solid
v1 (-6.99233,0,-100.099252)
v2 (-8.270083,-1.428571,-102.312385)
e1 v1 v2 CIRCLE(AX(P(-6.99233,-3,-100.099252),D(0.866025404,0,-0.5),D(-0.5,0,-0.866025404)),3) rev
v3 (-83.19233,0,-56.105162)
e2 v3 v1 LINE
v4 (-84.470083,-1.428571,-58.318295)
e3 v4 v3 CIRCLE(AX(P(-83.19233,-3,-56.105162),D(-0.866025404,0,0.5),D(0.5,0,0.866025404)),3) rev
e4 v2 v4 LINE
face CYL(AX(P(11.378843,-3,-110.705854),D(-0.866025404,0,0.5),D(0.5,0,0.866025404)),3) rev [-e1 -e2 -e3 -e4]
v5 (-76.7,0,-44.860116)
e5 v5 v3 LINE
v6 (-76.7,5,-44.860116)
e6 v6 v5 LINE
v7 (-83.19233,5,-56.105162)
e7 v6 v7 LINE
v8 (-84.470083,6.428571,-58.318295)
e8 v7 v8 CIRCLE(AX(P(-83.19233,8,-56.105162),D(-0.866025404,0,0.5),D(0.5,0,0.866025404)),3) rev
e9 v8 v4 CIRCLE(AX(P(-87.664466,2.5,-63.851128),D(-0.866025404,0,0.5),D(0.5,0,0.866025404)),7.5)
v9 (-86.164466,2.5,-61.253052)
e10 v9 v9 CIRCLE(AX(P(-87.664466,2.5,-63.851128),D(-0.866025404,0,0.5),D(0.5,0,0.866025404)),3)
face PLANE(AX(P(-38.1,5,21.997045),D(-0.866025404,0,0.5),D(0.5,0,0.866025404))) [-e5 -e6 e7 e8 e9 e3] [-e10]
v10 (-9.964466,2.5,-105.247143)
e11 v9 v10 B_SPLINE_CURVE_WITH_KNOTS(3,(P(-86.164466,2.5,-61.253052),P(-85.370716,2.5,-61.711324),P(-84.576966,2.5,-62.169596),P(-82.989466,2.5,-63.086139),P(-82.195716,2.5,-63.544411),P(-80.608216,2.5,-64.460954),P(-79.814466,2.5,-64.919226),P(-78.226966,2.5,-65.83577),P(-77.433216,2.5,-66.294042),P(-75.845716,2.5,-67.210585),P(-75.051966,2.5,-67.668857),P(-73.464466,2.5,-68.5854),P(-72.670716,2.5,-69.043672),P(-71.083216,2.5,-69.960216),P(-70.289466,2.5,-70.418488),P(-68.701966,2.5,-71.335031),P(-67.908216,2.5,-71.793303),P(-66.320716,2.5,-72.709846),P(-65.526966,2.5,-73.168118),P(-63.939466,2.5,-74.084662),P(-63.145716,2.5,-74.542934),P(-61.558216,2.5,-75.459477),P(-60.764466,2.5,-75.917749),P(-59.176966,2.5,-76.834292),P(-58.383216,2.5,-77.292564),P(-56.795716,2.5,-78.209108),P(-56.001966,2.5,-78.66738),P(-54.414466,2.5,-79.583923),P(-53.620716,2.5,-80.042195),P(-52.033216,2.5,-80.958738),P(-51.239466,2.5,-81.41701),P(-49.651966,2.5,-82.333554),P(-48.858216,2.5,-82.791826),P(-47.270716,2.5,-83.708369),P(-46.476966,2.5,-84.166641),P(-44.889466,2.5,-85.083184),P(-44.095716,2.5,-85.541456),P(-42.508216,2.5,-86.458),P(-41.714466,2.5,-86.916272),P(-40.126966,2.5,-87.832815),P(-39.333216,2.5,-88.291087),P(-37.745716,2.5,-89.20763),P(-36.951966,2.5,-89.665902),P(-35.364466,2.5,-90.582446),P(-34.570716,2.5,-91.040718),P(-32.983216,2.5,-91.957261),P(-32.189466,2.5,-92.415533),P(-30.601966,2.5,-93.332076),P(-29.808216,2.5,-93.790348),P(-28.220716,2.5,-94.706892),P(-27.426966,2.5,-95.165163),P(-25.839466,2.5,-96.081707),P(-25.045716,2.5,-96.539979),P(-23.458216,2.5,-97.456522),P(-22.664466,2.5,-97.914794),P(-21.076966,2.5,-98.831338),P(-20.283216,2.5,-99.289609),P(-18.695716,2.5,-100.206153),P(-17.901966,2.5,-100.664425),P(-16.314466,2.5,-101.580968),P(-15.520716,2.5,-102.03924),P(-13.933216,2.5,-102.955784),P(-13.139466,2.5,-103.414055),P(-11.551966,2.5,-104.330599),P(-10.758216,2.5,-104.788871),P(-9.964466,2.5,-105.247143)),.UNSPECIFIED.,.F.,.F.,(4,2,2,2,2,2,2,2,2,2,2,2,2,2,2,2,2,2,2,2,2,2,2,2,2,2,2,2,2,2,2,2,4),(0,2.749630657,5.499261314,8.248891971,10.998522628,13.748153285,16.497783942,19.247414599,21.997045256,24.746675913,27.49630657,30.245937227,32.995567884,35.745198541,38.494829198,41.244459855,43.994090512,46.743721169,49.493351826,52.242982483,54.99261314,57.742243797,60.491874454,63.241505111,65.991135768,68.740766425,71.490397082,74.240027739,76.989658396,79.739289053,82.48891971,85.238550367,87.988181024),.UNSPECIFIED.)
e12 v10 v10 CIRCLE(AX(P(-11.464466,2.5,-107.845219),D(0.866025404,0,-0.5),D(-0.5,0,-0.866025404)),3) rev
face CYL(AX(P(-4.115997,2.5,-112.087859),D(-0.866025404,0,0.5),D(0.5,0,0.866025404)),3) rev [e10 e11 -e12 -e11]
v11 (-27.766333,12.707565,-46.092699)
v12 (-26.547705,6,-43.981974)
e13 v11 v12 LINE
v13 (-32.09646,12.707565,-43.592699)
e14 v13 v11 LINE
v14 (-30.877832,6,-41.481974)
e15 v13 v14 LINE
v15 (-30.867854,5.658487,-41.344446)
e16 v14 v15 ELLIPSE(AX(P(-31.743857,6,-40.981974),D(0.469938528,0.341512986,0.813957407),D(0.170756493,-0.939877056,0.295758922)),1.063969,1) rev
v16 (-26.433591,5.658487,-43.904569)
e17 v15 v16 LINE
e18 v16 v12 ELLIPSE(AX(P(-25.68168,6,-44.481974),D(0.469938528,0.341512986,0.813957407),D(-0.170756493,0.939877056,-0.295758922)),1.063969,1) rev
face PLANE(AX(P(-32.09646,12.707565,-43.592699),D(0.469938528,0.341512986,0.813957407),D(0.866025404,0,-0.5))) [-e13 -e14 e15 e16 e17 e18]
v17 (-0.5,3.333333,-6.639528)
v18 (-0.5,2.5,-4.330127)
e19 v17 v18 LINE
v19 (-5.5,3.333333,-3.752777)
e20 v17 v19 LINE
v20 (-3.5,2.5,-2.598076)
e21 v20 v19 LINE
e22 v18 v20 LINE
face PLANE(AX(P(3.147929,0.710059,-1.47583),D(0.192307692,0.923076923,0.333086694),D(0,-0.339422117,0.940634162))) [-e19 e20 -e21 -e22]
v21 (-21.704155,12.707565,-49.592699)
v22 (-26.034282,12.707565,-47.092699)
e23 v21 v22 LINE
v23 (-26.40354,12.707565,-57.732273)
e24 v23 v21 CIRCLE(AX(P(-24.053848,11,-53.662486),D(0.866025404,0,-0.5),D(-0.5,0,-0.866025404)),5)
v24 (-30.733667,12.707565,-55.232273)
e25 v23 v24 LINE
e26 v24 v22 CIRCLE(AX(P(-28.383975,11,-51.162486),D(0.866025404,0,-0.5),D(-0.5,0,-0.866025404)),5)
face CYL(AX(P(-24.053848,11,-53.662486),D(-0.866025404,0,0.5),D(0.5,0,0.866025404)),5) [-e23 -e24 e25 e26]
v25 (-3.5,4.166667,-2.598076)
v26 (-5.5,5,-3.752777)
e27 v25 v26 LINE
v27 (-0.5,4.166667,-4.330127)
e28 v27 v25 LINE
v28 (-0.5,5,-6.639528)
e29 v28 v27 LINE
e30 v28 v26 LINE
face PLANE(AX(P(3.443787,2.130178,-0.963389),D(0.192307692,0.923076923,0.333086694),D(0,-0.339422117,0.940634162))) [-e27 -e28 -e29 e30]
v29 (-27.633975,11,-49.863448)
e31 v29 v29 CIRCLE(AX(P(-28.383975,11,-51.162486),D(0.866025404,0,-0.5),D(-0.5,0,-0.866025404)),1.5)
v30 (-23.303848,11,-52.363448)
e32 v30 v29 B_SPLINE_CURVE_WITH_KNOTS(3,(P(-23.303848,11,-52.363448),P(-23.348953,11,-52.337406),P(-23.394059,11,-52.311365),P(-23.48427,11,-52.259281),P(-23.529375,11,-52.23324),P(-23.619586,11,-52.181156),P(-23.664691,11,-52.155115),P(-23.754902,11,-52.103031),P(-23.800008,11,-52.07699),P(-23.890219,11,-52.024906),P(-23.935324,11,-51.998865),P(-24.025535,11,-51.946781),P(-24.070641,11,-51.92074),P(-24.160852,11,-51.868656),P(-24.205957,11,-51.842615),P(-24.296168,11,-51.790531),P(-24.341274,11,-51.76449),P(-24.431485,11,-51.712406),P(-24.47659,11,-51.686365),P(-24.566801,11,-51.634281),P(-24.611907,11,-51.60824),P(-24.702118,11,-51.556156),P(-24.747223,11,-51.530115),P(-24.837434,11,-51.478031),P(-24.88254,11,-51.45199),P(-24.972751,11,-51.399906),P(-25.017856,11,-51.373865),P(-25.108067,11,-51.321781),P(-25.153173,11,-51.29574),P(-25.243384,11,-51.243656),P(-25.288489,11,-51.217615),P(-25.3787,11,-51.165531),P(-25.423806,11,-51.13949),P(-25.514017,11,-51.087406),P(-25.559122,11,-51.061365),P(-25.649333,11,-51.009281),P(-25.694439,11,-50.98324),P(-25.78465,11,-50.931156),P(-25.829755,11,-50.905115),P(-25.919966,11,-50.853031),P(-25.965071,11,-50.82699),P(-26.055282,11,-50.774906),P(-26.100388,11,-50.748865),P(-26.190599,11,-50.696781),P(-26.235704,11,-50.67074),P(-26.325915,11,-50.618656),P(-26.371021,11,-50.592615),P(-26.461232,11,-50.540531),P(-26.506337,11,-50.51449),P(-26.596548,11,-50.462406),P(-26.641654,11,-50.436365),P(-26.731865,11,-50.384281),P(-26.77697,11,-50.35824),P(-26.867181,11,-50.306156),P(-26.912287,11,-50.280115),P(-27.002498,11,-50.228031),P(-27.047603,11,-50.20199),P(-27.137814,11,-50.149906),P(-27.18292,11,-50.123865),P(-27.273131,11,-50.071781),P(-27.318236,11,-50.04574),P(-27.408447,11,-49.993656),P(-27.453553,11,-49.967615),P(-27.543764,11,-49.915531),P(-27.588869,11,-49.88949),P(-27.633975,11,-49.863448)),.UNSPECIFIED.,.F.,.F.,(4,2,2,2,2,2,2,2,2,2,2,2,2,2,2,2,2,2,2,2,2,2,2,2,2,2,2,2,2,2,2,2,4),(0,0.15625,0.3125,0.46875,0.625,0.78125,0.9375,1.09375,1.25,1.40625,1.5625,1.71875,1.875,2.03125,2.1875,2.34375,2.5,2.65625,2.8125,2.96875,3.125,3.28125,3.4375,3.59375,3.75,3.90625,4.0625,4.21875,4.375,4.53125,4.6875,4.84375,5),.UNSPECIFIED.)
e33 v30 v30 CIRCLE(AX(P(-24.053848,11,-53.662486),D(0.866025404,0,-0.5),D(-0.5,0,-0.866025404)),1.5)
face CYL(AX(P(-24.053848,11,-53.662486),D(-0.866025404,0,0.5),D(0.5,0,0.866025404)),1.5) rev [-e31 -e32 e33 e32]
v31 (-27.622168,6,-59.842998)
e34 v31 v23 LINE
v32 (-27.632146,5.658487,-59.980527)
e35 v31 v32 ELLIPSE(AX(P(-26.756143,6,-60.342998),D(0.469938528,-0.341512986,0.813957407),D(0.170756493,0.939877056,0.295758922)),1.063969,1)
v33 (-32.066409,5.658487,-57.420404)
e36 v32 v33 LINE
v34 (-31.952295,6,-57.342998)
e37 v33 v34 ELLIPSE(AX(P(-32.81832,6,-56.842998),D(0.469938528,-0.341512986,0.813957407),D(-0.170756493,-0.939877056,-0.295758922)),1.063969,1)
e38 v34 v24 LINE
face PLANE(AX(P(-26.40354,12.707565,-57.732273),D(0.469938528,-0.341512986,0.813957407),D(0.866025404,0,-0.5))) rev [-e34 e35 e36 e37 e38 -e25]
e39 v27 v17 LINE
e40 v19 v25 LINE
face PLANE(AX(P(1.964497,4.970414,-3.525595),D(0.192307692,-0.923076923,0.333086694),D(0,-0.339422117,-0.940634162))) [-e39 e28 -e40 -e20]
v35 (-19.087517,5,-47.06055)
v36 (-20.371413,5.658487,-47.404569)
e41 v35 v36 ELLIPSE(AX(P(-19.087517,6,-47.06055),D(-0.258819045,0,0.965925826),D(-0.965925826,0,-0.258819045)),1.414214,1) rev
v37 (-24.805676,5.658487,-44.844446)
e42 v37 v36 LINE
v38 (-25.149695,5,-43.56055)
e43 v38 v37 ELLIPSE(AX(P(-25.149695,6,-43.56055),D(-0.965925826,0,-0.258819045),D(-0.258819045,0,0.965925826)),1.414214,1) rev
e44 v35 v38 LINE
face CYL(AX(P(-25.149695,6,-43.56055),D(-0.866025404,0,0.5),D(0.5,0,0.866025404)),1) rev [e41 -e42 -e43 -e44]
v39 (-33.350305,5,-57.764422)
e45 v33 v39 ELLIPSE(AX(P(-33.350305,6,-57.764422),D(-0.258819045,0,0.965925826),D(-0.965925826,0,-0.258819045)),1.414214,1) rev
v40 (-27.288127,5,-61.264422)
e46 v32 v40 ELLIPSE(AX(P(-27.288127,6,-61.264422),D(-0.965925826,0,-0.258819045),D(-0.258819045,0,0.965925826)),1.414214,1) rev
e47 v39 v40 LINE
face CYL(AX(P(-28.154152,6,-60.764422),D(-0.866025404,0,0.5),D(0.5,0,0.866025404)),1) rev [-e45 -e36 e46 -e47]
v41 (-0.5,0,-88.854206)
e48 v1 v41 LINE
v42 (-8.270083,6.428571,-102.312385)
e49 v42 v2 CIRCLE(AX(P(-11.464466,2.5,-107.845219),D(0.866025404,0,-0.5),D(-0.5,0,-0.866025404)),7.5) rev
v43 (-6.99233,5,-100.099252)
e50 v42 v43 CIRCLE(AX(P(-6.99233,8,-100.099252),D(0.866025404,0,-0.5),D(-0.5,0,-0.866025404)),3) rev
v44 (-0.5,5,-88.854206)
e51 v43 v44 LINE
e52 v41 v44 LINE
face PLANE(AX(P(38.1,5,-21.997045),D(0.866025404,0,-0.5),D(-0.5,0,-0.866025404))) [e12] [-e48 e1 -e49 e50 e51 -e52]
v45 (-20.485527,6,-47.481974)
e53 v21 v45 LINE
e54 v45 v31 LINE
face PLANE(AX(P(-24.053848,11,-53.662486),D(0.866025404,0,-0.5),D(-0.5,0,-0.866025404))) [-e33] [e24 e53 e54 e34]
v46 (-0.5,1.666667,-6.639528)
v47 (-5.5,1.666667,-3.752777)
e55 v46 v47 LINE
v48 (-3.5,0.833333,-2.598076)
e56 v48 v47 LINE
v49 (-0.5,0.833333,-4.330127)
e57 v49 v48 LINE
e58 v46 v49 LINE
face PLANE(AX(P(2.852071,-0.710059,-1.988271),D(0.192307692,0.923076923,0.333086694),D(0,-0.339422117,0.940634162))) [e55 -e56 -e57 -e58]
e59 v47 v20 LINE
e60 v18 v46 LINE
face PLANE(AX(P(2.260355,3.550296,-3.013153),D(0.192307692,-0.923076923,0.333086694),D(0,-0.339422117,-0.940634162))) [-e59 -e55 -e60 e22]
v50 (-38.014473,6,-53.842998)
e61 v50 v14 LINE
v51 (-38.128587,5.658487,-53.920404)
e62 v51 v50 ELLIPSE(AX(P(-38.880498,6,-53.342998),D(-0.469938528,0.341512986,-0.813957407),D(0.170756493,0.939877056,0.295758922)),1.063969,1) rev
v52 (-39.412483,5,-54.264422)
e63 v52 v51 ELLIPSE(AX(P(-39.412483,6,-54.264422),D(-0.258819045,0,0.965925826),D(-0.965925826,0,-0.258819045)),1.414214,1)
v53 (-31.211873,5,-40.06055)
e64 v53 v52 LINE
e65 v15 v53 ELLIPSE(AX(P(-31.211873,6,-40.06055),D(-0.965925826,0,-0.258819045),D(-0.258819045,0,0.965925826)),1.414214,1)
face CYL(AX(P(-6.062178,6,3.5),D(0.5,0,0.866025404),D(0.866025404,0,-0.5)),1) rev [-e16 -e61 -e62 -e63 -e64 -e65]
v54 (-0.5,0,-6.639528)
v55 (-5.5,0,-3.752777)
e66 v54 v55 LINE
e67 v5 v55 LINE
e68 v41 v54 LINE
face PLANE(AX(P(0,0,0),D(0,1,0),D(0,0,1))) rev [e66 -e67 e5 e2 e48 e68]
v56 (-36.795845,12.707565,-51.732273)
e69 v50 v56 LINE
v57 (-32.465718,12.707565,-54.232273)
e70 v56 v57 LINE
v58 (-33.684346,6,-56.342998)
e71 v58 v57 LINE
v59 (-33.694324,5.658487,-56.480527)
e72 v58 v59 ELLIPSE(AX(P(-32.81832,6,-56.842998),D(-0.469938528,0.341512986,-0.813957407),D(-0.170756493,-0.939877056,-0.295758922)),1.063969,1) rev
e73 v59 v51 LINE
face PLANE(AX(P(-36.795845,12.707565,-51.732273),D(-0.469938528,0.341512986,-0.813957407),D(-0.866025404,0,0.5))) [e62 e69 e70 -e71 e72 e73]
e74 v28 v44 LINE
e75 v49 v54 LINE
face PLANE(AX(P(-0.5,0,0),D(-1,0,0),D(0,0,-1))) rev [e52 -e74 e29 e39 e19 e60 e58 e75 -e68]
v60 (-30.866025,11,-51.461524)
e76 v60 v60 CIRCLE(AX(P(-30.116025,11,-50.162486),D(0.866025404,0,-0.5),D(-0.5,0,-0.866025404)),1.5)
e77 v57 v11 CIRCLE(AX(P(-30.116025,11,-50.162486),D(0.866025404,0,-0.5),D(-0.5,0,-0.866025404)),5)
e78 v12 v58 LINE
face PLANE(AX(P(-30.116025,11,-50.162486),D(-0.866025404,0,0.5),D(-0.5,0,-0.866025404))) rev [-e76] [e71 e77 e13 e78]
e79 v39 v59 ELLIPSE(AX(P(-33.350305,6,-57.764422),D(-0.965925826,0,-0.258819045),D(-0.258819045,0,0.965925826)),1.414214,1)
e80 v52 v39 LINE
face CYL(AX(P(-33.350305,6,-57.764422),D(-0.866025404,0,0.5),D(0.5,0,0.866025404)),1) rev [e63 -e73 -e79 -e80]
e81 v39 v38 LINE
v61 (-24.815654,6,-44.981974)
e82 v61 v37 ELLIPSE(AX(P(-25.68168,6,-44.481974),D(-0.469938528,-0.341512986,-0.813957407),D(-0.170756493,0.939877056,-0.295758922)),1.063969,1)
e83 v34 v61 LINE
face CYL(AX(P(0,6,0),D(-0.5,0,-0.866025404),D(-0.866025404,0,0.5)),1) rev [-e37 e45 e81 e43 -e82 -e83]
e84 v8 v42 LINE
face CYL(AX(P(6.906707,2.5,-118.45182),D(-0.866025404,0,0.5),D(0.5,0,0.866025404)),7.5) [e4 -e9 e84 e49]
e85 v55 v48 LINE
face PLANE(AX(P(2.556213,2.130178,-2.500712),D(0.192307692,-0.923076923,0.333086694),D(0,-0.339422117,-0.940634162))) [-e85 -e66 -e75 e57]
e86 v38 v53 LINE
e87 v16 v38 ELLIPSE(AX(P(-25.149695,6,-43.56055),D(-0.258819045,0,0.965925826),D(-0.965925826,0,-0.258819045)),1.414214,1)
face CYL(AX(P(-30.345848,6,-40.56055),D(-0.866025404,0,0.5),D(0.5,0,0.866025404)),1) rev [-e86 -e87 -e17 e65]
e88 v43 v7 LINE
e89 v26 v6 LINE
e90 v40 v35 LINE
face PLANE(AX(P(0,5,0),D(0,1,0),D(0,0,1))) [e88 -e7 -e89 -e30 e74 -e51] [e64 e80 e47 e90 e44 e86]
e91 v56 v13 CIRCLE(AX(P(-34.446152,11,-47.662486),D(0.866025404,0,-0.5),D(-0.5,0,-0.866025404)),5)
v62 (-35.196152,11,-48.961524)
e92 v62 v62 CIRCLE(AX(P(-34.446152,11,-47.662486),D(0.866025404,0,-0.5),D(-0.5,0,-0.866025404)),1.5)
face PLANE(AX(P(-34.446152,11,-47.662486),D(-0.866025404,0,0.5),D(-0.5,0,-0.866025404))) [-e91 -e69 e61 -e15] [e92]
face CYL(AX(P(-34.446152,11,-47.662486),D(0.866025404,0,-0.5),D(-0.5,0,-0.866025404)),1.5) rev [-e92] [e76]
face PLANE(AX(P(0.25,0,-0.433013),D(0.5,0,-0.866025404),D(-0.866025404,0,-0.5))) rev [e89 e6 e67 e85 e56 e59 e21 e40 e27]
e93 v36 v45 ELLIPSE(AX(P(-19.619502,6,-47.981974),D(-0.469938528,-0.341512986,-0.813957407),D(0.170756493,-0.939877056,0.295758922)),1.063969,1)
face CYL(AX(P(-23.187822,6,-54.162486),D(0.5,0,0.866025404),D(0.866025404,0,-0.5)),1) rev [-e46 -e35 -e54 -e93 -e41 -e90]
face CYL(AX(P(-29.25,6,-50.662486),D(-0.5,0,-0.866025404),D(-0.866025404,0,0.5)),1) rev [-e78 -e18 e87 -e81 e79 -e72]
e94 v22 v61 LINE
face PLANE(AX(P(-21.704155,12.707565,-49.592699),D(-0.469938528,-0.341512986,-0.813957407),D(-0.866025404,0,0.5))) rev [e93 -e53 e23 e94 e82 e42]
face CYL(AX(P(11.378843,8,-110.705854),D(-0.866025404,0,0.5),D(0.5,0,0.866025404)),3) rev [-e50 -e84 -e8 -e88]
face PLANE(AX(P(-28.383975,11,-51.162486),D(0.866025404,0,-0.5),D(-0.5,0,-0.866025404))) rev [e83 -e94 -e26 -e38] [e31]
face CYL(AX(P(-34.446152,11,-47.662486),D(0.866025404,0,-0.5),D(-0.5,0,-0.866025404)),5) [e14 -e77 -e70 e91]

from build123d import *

# Parameters (mm, degrees)
BOSS_EXTRUDE1_DEPTH = 5
SKETCH2_R           = 7.5
BOSS_EXTRUDE2_DEPTH = 87.988181024
SKETCH3_R           = 3
CUT_EXTRUDE1_DEPTH  = 87.988181024
CUT_EXTRUDE2_DEPTH  = 5
BOSS_EXTRUDE3_DEPTH = 6.928203
CUT_EXTRUDE3_START  = -0.5
SKETCH10_W          = 96.059977794
SKETCH10_H          = 5
CUT_EXTRUDE3_DEPTH  = 10.5
BOSS_EXTRUDE4_START = 1
SKETCH11_R          = 1.5
BOSS_EXTRUDE4_DEPTH = 5
FILLET1_R           = 1
FILLET2_R           = 3


with BuildPart() as part:
    # Sketch1 → Boss-Extrude1 (new body)
    with BuildSketch(Plane(origin=(0, 0, 0), x_dir=(1, 0, 0), z_dir=(0, 1, 0))):
        Polygon((0, 87.988181024), (0, 0), (-76.2, 43.994090512), (-91.2, 69.974852626), (-15, 113.968943138), align=None)
    extrude(amount=BOSS_EXTRUDE1_DEPTH)

    # Sketch2 → Boss-Extrude2 (add)
    with BuildSketch(Plane(origin=(-38.1, 0, 21.997045256), x_dir=(0.49999999999999967, 0, 0.8660254037844388), z_dir=(-0.8660254037844388, 0, 0.49999999999999967))):
        with Locations((-99.128932188, 2.5)):
            Circle(SKETCH2_R)
    extrude(amount=-BOSS_EXTRUDE2_DEPTH)

    # Sketch3 → Cut-Extrude1 (cut)
    with BuildSketch(Plane(origin=(-38.1, 0, 21.997045256), x_dir=(0.49999999999999967, 0, 0.8660254037844388), z_dir=(-0.8660254037844388, 0, 0.49999999999999967))):
        with Locations((-99.128932188, 2.5)):
            Circle(SKETCH3_R)
    extrude(amount=-CUT_EXTRUDE1_DEPTH, mode=Mode.SUBTRACT)

    # Sketch5 → Cut-Extrude2 (cut)
    with BuildSketch(Plane(origin=(0, 5, 0), x_dir=(1, 0, 0), z_dir=(0, 1, 0))):
        Polygon((-6, 3.464101615), (0, 6.92820323), (0, 0), align=None)
    extrude(amount=-CUT_EXTRUDE2_DEPTH, mode=Mode.SUBTRACT)

    # Sketch7 → Boss-Extrude3 (add)
    with BuildSketch(Plane(origin=(-3, 0, 1.732050808), x_dir=(0, 1, 0), z_dir=(0.8660254037844383, 0, -0.5000000000000006))):
        Polygon((0.833333333, -4), (0, -6), (1.666666667, -6), align=None)
        Polygon((2.5, -4), (1.666666667, -6), (3.333333333, -6), align=None)
        Polygon((4.166666667, -4), (3.333333333, -6), (5, -6), align=None)
    extrude(amount=BOSS_EXTRUDE3_DEPTH)

    # Sketch10 → Cut-Extrude3 (cut)
    with BuildSketch(Plane(origin=(0, 0, 0), x_dir=(0.8660254037844386, 0, 0.5000000000000001), z_dir=(-0.5000000000000001, 0, 0.8660254037844386)).offset(CUT_EXTRUDE3_START)):
        with Locations((-44.958192127, 2.5)):
            Rectangle(SKETCH10_W, SKETCH10_H)
    cut_extrude3 = extrude(amount=CUT_EXTRUDE3_DEPTH, mode=Mode.SUBTRACT)

    # Mirror1: Cut-Extrude3 across plane
    add(cut_extrude3.mirror(Plane(origin=(0, 0, 0), x_dir=(0.4999999999999997, 0, 0.8660254037844387), z_dir=(0.8660254037844387, 0, -0.49999999999999983))), mode=Mode.SUBTRACT)

    # Sketch11 → Boss-Extrude4 (add)
    with BuildSketch(Plane(origin=(0, 0, 0), x_dir=(-0.49999999999999983, 0, -0.8660254037844387), z_dir=(0.8660254037844387, 0, -0.49999999999999983)).offset(BOSS_EXTRUDE4_START)):
        with BuildLine():
            Line((53.800614721, 12.707564932), (51, 5))
            Line((51, 5), (66, 5))
            Line((66, 5), (63.199385279, 12.707564932))
            ThreePointArc((63.199385279, 12.707564932), (58.5, 16), (53.800614721, 12.707564932))
        make_face()
        with Locations(Location((58.5, 11, 0), (0, 0, 180))):
            Circle(SKETCH11_R, mode=Mode.SUBTRACT)
    boss_extrude4 = extrude(amount=BOSS_EXTRUDE4_DEPTH)

    # Mirror2: Boss-Extrude4 across plane
    add(boss_extrude4.mirror(Plane(origin=(0, 0, 0), x_dir=(0.4999999999999997, 0, 0.8660254037844387), z_dir=(0.8660254037844387, 0, -0.49999999999999983))))

    # Fillet1
    fillet1_edges = [part.edges().sort_by_distance(p)[0] for p in [
        (-24.053847577, 5, -53.662486121),
        (-28.383974596, 5, -51.162486121),
        (-22.468911087, 5, -45.917295593),
        (-29.968911087, 5, -58.90767665),
        (-34.446152423, 5, -47.662486121),
        (-36.031088913, 5, -55.40767665),
        (-28.531088913, 5, -42.417295593),
        (-30.116025404, 5, -50.162486121),
    ]]
    fillet(fillet1_edges, radius=FILLET1_R - 0.0001)  # a hair under: the kernel refuses the full size

    # Fillet2
    fillet2_edges = [part.edges().sort_by_distance(p)[0] for p in [
        (-46.028932188, 0, -79.724449168),
        (-46.028932188, 5, -79.724449168),
    ]]
    fillet(fillet2_edges, radius=FILLET2_R)


solid = part.part
